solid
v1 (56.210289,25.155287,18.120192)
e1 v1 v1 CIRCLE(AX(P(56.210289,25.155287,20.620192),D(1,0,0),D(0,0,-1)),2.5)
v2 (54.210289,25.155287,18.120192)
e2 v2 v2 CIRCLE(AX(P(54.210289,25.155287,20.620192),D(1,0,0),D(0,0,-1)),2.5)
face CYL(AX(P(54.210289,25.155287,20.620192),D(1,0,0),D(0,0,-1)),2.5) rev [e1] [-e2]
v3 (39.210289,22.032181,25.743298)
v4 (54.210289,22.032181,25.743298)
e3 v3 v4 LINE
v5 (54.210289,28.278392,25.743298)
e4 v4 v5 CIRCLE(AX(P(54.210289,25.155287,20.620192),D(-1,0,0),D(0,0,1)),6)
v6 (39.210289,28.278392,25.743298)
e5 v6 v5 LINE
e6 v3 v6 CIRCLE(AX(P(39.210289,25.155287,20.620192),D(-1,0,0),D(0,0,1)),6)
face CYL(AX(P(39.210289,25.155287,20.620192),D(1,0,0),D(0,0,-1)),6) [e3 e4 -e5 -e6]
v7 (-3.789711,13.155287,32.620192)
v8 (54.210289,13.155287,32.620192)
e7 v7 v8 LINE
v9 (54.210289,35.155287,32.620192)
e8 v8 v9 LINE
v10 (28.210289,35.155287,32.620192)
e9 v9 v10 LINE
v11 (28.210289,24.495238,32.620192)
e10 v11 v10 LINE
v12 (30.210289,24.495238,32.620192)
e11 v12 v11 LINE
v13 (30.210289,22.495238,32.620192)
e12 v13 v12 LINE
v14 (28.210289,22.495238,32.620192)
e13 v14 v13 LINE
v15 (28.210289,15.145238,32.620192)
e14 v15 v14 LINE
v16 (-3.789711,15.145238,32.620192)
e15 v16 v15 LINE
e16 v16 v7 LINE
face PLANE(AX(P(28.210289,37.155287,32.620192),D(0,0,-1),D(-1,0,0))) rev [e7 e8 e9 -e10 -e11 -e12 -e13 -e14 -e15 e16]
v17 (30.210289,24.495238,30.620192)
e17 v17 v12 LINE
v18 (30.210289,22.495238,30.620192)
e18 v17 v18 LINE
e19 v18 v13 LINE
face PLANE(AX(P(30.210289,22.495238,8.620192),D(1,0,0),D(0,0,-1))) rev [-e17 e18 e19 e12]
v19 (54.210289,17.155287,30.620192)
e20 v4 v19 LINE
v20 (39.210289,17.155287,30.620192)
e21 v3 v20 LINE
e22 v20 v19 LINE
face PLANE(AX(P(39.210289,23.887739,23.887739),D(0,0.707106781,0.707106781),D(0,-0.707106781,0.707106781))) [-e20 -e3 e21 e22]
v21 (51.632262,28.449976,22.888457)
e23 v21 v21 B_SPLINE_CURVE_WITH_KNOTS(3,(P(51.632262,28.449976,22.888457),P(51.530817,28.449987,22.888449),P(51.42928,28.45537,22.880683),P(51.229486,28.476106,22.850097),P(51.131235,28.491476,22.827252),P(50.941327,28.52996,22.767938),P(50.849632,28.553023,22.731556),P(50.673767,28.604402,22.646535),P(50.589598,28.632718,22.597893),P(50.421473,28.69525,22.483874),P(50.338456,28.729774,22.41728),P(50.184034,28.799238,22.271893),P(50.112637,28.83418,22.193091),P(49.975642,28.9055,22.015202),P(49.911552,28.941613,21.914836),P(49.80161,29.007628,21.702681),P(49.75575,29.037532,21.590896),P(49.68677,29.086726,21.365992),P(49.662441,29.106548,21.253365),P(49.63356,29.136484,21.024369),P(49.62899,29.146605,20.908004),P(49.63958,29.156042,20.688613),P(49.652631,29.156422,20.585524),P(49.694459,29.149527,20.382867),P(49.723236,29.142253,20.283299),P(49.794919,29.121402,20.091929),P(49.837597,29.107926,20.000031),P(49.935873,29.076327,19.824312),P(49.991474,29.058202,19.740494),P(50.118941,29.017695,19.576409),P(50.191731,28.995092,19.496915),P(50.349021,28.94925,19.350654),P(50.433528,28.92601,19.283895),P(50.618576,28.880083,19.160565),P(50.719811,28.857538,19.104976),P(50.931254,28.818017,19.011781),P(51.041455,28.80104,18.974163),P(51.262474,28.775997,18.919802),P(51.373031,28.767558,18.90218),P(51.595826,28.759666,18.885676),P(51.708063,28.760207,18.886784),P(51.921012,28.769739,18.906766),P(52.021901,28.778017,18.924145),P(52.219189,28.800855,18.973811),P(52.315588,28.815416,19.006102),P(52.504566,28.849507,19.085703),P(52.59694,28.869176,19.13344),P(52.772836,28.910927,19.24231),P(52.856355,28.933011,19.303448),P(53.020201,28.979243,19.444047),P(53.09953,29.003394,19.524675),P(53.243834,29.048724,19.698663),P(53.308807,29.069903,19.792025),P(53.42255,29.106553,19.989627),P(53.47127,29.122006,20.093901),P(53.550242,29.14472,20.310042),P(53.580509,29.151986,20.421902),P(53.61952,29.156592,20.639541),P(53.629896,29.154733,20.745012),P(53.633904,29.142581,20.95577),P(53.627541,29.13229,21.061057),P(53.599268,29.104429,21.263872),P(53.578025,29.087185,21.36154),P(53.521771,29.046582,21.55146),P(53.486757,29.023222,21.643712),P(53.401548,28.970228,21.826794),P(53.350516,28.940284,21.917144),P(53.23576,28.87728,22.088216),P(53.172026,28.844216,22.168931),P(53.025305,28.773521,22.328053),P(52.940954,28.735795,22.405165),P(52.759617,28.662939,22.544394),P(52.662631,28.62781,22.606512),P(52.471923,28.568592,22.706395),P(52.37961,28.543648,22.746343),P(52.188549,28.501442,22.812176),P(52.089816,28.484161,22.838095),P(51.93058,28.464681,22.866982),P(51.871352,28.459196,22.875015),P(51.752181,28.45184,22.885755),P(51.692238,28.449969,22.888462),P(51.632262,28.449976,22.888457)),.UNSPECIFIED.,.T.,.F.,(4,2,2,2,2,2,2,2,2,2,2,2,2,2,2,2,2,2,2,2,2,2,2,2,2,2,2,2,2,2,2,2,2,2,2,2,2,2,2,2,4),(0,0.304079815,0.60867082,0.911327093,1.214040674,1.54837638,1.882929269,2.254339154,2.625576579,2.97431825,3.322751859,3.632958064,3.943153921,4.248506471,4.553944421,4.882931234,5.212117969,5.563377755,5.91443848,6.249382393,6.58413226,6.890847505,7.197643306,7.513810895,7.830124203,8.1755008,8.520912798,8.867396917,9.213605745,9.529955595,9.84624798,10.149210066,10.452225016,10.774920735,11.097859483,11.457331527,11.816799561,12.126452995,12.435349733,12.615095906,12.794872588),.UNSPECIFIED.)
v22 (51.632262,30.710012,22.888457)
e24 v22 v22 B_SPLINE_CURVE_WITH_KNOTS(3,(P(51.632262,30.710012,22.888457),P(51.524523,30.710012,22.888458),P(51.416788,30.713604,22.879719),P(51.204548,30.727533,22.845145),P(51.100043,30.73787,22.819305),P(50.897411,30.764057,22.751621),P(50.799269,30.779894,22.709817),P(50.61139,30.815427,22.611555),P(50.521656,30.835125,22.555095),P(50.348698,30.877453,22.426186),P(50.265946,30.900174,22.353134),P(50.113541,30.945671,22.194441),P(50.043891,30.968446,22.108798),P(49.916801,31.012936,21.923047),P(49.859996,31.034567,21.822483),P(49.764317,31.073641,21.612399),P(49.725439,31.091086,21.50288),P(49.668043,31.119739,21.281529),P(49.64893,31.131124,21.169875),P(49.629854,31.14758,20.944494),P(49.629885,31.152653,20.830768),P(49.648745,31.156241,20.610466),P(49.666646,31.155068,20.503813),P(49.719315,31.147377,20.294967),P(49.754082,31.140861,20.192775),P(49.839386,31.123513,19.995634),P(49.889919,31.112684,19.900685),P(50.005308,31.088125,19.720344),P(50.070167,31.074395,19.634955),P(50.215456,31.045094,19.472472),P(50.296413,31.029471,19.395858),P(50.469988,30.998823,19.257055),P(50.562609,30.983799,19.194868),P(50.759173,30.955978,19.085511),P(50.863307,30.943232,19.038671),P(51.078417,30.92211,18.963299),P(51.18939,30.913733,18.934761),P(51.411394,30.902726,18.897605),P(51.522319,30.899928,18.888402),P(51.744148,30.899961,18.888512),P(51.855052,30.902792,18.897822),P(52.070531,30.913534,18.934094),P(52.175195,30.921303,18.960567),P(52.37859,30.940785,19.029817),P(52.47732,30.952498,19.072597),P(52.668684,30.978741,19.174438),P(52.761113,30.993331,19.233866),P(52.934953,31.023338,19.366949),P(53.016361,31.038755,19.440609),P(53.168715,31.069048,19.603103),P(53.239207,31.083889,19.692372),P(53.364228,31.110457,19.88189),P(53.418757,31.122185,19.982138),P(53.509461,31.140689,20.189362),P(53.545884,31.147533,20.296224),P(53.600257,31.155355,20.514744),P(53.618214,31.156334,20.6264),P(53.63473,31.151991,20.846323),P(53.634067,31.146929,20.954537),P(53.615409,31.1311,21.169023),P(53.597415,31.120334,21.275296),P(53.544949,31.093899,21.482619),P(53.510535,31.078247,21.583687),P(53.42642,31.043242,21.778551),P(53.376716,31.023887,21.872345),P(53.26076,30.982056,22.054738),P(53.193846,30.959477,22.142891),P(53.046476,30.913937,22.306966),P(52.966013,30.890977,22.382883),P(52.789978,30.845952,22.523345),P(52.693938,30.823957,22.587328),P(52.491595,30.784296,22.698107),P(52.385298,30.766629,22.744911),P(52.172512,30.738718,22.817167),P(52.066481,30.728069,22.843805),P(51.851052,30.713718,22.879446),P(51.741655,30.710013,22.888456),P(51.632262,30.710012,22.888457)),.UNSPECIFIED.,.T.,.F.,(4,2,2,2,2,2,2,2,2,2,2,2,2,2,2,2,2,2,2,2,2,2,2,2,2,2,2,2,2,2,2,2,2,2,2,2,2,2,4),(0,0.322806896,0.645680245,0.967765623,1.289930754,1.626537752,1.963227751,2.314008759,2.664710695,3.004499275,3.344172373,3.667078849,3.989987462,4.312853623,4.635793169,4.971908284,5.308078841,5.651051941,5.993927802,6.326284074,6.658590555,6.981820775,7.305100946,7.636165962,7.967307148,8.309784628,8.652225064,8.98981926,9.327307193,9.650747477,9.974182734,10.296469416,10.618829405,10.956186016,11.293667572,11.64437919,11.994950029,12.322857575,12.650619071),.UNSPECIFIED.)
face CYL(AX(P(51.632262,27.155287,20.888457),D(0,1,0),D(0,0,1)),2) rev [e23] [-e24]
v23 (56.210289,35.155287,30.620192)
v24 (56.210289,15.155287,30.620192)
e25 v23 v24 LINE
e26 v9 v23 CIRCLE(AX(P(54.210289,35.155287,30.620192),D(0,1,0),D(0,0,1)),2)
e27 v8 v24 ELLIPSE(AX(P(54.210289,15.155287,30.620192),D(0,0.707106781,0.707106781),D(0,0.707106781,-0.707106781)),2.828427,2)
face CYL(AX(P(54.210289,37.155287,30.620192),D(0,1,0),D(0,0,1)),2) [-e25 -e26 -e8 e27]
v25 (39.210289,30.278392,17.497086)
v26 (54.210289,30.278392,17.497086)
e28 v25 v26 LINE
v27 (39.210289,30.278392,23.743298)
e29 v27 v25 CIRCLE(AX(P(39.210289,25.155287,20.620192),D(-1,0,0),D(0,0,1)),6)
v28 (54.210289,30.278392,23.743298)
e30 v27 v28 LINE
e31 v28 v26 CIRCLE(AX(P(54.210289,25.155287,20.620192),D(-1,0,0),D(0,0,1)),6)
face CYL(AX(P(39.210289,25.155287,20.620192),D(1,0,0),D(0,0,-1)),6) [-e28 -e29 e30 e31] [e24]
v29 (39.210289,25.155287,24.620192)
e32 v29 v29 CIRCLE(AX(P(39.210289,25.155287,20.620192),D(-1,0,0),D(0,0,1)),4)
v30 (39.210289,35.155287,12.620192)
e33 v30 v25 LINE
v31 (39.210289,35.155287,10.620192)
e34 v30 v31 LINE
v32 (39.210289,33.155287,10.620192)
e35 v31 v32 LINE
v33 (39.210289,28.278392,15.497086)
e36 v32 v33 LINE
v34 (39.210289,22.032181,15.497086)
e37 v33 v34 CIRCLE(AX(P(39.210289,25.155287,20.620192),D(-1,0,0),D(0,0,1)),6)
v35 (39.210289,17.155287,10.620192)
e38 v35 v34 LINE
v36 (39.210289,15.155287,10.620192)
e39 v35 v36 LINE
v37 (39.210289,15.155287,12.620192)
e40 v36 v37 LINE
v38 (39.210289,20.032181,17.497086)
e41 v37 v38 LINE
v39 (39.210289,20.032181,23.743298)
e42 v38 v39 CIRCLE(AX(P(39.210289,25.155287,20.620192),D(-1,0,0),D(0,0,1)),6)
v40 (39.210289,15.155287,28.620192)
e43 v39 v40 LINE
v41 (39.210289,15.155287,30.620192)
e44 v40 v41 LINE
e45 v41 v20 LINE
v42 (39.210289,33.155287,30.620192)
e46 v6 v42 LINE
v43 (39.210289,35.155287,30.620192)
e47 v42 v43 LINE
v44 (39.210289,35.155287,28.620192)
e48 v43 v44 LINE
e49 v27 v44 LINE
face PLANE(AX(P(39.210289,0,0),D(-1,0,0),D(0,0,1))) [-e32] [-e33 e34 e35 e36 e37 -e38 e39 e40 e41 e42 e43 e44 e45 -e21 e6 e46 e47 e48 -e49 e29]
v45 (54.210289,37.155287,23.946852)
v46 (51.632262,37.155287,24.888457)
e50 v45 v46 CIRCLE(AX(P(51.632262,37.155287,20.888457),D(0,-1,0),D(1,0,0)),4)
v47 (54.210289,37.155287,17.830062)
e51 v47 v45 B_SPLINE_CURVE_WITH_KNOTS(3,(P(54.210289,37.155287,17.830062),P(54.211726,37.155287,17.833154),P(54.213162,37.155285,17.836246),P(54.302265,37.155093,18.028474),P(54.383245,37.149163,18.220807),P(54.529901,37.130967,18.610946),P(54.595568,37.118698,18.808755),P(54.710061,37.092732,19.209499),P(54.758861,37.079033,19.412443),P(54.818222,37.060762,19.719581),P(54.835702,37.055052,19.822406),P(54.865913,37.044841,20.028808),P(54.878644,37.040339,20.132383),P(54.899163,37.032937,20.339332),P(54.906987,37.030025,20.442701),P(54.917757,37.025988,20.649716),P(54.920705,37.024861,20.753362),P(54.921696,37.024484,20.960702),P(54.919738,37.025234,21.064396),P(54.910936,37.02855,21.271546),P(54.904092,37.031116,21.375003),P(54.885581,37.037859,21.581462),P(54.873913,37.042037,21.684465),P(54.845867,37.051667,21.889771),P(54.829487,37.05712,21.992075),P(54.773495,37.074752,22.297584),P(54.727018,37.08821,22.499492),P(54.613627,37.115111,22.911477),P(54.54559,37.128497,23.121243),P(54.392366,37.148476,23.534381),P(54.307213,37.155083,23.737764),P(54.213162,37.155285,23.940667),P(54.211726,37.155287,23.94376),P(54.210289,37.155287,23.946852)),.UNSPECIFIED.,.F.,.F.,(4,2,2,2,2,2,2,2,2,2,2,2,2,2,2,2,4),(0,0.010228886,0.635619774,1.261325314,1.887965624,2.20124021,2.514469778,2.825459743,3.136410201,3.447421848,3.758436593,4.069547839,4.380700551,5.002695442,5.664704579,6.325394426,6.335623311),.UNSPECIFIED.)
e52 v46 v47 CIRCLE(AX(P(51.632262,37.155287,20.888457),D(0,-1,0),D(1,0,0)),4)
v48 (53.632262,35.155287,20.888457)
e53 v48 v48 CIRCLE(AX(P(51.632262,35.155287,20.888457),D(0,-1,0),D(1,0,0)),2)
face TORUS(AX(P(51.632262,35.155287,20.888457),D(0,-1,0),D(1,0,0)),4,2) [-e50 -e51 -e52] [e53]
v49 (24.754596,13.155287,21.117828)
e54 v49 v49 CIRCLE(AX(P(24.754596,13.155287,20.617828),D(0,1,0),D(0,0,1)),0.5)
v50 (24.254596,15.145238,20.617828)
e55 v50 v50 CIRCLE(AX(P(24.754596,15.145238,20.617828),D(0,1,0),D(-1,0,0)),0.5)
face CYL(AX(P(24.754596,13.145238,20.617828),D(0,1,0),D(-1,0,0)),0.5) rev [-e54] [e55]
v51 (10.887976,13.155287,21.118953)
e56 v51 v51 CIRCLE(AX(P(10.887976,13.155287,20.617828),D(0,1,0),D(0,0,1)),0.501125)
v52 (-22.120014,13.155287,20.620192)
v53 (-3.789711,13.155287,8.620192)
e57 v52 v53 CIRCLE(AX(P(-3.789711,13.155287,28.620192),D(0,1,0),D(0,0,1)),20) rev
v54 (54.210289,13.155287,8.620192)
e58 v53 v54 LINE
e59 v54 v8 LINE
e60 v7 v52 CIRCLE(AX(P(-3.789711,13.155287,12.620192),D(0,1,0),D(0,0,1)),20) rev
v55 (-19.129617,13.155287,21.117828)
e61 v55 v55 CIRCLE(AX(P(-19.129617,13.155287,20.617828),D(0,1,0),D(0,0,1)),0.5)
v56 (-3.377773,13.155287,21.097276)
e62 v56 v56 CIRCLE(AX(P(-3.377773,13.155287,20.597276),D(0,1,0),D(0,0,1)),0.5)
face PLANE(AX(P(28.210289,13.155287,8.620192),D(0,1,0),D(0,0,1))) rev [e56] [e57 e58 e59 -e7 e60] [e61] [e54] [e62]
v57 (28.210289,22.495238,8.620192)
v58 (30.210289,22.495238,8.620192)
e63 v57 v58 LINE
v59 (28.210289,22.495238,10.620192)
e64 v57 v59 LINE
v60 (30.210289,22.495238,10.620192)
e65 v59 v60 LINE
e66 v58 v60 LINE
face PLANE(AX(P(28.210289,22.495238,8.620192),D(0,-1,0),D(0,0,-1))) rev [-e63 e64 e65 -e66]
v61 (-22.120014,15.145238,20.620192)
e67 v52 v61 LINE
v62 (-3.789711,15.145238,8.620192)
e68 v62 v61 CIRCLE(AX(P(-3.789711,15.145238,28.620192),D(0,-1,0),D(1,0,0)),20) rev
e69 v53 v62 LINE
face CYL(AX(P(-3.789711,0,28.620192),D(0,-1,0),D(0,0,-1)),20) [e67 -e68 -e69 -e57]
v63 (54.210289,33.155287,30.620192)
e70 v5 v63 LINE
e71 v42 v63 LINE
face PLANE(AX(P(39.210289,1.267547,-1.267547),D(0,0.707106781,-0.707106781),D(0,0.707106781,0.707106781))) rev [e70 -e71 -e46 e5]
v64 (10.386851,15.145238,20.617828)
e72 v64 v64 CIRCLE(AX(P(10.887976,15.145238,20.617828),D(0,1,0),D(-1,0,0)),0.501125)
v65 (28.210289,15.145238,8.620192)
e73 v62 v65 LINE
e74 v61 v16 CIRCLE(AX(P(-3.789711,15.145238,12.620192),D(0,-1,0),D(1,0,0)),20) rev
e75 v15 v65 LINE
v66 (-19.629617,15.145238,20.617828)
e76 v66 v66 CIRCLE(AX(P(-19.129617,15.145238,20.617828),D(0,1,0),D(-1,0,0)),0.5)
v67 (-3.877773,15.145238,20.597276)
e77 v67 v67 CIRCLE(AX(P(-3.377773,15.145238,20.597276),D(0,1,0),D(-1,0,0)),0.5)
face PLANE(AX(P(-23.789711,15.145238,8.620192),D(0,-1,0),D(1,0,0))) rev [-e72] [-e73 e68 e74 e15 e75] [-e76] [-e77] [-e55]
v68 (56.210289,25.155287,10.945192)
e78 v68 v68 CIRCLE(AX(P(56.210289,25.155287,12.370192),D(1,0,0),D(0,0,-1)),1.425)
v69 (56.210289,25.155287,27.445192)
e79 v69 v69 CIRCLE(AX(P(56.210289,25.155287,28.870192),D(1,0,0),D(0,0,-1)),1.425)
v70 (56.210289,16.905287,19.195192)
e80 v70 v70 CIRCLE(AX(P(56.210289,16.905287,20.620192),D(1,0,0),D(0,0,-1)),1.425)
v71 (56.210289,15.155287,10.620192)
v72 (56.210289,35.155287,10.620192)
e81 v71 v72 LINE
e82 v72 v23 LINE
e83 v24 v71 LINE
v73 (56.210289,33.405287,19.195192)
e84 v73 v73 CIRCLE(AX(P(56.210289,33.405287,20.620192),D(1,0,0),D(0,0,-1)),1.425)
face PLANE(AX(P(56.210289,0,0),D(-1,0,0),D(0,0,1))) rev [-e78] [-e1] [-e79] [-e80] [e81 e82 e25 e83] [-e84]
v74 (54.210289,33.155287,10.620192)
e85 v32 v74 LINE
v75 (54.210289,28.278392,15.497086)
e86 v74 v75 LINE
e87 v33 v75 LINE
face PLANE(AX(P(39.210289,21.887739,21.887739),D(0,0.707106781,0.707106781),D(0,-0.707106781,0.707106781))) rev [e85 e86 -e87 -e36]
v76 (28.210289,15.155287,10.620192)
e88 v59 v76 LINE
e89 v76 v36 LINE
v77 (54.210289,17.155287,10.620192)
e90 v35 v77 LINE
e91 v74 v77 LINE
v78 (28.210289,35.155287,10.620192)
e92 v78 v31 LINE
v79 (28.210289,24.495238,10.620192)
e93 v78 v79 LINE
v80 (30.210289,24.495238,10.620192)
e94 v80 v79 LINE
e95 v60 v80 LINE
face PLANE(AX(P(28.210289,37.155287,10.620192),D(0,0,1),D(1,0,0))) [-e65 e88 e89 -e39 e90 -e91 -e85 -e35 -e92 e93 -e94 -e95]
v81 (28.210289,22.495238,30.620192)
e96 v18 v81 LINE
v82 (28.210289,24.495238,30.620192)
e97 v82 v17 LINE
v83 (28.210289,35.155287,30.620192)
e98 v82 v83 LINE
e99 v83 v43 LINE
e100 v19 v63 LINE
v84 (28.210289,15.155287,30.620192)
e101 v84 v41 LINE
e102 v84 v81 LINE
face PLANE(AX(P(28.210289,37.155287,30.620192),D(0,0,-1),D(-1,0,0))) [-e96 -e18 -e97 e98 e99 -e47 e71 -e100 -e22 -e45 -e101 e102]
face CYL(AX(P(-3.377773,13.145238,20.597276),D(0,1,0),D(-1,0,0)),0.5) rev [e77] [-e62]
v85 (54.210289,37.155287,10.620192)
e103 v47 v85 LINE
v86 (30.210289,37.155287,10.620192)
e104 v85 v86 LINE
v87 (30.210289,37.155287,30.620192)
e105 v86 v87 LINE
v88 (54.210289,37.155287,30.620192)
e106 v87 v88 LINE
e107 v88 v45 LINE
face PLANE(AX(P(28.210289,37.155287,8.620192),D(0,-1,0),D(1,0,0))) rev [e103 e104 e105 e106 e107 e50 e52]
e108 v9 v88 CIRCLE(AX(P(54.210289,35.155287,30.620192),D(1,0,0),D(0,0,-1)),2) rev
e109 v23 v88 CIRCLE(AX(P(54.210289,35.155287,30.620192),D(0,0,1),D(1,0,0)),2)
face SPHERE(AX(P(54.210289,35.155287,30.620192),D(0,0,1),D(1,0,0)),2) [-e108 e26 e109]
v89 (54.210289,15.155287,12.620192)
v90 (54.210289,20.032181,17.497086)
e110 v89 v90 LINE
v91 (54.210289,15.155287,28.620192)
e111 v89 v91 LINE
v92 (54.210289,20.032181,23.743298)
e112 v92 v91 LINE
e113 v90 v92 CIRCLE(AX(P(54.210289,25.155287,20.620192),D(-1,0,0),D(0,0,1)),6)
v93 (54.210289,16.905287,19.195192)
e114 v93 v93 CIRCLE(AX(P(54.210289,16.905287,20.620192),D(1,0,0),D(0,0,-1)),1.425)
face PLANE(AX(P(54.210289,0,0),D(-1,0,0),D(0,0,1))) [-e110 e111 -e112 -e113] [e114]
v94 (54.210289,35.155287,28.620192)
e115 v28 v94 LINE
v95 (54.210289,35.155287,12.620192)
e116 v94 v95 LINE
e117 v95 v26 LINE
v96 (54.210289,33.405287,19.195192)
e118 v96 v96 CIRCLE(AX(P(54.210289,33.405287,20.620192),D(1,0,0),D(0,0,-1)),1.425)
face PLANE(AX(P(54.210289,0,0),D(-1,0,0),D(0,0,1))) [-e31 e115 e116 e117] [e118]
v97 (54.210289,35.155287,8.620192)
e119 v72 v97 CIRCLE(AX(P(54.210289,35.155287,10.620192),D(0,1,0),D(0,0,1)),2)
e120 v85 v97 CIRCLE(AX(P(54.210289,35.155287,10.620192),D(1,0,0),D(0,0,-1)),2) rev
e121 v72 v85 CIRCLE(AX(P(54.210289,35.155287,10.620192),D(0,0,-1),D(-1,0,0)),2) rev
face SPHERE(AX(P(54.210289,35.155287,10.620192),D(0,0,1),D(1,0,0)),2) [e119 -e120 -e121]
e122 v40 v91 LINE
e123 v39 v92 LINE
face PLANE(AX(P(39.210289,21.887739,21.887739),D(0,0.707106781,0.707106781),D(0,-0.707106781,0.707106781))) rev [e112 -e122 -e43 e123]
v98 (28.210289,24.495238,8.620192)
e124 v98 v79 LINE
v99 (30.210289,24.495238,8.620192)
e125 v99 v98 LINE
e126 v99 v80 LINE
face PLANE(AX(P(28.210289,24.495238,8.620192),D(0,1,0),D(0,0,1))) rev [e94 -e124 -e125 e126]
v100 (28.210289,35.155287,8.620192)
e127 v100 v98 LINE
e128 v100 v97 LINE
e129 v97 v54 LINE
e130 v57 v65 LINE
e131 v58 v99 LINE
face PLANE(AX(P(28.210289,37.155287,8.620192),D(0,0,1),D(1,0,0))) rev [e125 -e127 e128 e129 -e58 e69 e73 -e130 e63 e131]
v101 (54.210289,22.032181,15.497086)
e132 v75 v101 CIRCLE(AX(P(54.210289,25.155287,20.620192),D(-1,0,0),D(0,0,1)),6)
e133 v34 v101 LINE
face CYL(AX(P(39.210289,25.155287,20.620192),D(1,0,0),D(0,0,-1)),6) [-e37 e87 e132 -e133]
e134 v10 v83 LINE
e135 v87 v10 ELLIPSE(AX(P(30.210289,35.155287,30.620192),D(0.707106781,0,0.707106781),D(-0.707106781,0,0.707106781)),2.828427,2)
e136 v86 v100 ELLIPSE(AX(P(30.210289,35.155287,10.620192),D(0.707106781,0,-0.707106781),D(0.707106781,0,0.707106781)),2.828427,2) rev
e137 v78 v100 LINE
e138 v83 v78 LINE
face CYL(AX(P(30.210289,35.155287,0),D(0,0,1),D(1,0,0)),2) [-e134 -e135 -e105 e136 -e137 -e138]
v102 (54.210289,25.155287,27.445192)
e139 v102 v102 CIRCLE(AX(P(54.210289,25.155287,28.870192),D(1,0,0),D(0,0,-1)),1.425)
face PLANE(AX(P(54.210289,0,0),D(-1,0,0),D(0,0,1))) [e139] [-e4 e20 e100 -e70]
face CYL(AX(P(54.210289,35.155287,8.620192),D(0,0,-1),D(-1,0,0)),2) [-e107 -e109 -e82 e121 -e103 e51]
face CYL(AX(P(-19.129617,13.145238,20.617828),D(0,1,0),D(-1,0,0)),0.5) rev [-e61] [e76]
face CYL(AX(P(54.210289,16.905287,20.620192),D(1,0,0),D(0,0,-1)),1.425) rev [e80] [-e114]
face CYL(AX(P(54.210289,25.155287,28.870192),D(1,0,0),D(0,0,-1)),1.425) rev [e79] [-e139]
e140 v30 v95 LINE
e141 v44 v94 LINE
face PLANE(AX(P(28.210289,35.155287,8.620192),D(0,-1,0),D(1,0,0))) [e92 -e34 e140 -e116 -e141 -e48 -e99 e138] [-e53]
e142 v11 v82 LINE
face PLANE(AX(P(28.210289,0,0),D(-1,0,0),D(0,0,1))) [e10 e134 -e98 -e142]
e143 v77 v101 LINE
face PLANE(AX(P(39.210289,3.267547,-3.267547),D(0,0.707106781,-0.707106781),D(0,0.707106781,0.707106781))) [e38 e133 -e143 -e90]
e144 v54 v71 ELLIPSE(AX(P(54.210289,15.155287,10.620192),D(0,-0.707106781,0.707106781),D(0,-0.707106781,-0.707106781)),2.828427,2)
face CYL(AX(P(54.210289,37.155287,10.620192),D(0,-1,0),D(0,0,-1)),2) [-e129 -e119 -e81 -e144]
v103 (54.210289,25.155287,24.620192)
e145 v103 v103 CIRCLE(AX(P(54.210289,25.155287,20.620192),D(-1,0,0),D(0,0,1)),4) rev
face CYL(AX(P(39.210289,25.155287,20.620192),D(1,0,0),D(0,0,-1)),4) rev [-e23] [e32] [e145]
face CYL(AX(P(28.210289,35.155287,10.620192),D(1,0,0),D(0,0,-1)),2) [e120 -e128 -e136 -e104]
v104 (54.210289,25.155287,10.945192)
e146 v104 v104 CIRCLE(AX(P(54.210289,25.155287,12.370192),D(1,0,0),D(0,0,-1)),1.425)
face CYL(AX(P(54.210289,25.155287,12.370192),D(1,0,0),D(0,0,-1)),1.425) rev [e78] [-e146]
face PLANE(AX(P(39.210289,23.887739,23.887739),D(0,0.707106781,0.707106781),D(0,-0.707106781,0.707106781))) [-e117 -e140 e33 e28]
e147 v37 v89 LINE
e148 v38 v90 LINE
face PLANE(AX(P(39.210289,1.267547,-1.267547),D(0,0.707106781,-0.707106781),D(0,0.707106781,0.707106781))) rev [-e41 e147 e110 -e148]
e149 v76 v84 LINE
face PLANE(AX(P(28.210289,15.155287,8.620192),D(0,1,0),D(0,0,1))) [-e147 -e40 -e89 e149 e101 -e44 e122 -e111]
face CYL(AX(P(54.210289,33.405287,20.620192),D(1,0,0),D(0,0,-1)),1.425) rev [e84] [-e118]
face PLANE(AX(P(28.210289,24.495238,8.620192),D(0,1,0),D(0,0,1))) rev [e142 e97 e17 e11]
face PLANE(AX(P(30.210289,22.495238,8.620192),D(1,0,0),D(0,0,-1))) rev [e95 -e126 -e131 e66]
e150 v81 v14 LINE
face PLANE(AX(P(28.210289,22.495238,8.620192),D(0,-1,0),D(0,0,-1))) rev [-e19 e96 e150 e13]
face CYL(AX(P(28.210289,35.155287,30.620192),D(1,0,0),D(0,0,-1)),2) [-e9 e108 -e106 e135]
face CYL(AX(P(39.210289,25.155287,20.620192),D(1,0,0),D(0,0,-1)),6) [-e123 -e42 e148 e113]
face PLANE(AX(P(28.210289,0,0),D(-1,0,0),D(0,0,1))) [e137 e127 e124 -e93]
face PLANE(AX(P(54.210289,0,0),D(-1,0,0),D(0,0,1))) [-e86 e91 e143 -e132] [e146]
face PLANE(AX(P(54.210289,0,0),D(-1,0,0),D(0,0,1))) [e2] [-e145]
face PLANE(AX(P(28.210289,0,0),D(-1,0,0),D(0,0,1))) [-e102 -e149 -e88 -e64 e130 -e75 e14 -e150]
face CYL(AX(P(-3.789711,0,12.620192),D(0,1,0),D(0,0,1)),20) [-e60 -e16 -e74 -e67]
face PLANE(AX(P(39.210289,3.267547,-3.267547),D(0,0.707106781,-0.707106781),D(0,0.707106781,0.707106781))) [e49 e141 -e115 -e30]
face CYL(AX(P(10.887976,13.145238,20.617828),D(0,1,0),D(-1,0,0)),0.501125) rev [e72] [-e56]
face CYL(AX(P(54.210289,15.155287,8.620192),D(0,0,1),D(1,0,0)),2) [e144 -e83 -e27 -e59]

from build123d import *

# Parameters (mm, degrees)
SKETCH1_W            = 24
SKETCH1_H            = 24
BOSS_EXTRUDE6_DEPTH  = 28
SHELL6_T             = -2
SKETCH4_R            = 1.425
SKETCH4_R_2          = 2.5
CUT_EXTRUDE2_DEPTH   = 2
BOSS_EXTRUDE12_DEPTH = 15
SKETCH5_R            = 2
CUT_EXTRUDE4_DEPTH   = 10
SKETCH8_W            = 24
SKETCH8_H            = 1.989951349
BOSS_EXTRUDE13_DEPTH = 52
FILLET1_R            = 20
SKETCH12_R           = 0.5
SKETCH12_R_2         = 0.501124618
CUT_EXTRUDE5_DEPTH   = 2
SKETCH15_W           = 2
SKETCH15_H           = 2
CUT_EXTRUDE8_DEPTH   = 72.527001046
FILLET3_R            = 2


with BuildPart() as part:
    # Sketch1 → Boss-Extrude6 (new body)
    with BuildSketch(Plane.ZY.offset(-56.210288662)):
        with Locations((20.620192101, 25.155286665)):
            Rectangle(SKETCH1_W, SKETCH1_H)
    extrude(amount=BOSS_EXTRUDE6_DEPTH)

    # Shell6
    shell6_openings = [part.faces().sort_by_distance(p)[0] for p in [
        (28.210288662, 25.155286665, 20.620192101),
    ]]
    offset(amount=SHELL6_T, openings=shell6_openings, kind=Kind.INTERSECTION)

    # Sketch4 → Cut-Extrude2 (cut)
    with BuildSketch(Plane(origin=(56.210288662, 25.155286665, 20.620192101), x_dir=(0, 0, -1), z_dir=(1, 0, 0))):
        with Locations((0, -8.25)):
            Circle(SKETCH4_R)
        with Locations((8.25, 0)):
            Circle(SKETCH4_R)
        with Locations((0, 8.25)):
            Circle(SKETCH4_R)
        with Locations((-8.25, 0)):
            Circle(SKETCH4_R)
        Circle(SKETCH4_R_2)
    extrude(amount=-CUT_EXTRUDE2_DEPTH, mode=Mode.SUBTRACT)

    # Sketch7 → Boss-Extrude12 (add)
    with BuildSketch(Plane.ZY.offset(-54.210288662)):
        with BuildLine():
            Line((24.862832788, 20.912645978), (30.620192101, 15.155286665))
            Line((30.620192101, 15.155286665), (30.620192101, 17.155286665))
            Line((30.620192101, 17.155286665), (25.743297726, 22.032181039))
            ThreePointArc((25.743297726, 22.032181039), (25.336402517, 21.446195225), (24.862832788, 20.912645978))
        make_face()
        with BuildLine():
            Line((28.620192101, 15.155286665), (30.620192101, 15.155286665))
            Line((30.620192101, 15.155286665), (24.862832788, 20.912645978))
            ThreePointArc((24.862832788, 20.912645978), (24.329283541, 20.439076249), (23.743297726, 20.032181039))
            Line((23.743297726, 20.032181039), (28.620192101, 15.155286665))
        make_face()
        with BuildLine():
            Line((10.620192101, 15.155286665), (12.620192101, 15.155286665))
            Line((12.620192101, 15.155286665), (17.497086475, 20.032181039))
            ThreePointArc((17.497086475, 20.032181039), (16.91110066, 20.439076249), (16.377551414, 20.912645978))
            Line((16.377551414, 20.912645978), (10.620192101, 15.155286665))
        make_face()
        with BuildLine():
            Line((10.620192101, 17.155286665), (10.620192101, 15.155286665))
            Line((10.620192101, 15.155286665), (16.377551414, 20.912645978))
            ThreePointArc((16.377551414, 20.912645978), (15.903981685, 21.446195225), (15.497086475, 22.032181039))
            Line((15.497086475, 22.032181039), (10.620192101, 17.155286665))
        make_face()
        with BuildLine():
            Line((10.620192101, 35.155286665), (10.620192101, 33.155286665))
            Line((10.620192101, 33.155286665), (15.497086475, 28.278392291))
            ThreePointArc((15.497086475, 28.278392291), (15.903981685, 28.864378105), (16.377551414, 29.397927352))
            Line((16.377551414, 29.397927352), (10.620192101, 35.155286665))
        make_face()
        with BuildLine():
            Line((17.497086475, 30.278392291), (12.620192101, 35.155286665))
            Line((12.620192101, 35.155286665), (10.620192101, 35.155286665))
            Line((10.620192101, 35.155286665), (16.377551414, 29.397927352))
            ThreePointArc((16.377551414, 29.397927352), (16.91110066, 29.871497081), (17.497086475, 30.278392291))
        make_face()
        with BuildLine():
            Line((24.862832788, 29.397927352), (30.620192101, 35.155286665))
            Line((30.620192101, 35.155286665), (28.620192101, 35.155286665))
            Line((28.620192101, 35.155286665), (23.743297726, 30.278392291))
            ThreePointArc((23.743297726, 30.278392291), (24.329283541, 29.871497081), (24.862832788, 29.397927352))
        make_face()
        with BuildLine():
            Line((25.743297726, 28.278392291), (30.620192101, 33.155286665))
            Line((30.620192101, 33.155286665), (30.620192101, 35.155286665))
            Line((30.620192101, 35.155286665), (24.862832788, 29.397927352))
            ThreePointArc((24.862832788, 29.397927352), (25.336402517, 28.864378105), (25.743297726, 28.278392291))
        make_face()
        with BuildLine():
            Line((22.265943412, 28.801037976), (23.743297726, 30.278392291))
            ThreePointArc((23.743297726, 30.278392291), (20.620192101, 31.155286665), (17.497086475, 30.278392291))
            Line((17.497086475, 30.278392291), (18.97444079, 28.801037976))
            ThreePointArc((18.97444079, 28.801037976), (20.620192101, 29.155286665), (22.265943412, 28.801037976))
        make_face()
        with BuildLine():
            ThreePointArc((15.497086475, 22.032181039), (15.903981685, 21.446195225), (16.377551414, 20.912645978))
            Line((16.377551414, 20.912645978), (17.791764976, 22.32685954))
            ThreePointArc((17.791764976, 22.32685954), (17.329534549, 22.881177416), (16.97444079, 23.509535354))
            Line((16.97444079, 23.509535354), (15.497086475, 22.032181039))
        make_face()
        with BuildLine():
            Line((23.448619226, 27.98371379), (24.862832788, 29.397927352))
            ThreePointArc((24.862832788, 29.397927352), (24.329283541, 29.871497081), (23.743297726, 30.278392291))
            Line((23.743297726, 30.278392291), (22.265943412, 28.801037976))
            ThreePointArc((22.265943412, 28.801037976), (22.89430135, 28.445944217), (23.448619226, 27.98371379))
        make_face()
        with BuildLine():
            ThreePointArc((16.377551414, 20.912645978), (16.91110066, 20.439076249), (17.497086475, 20.032181039))
            Line((17.497086475, 20.032181039), (18.97444079, 21.509535354))
            ThreePointArc((18.97444079, 21.509535354), (18.346082852, 21.864629113), (17.791764976, 22.32685954))
            Line((17.791764976, 22.32685954), (16.377551414, 20.912645978))
        make_face()
        with BuildLine():
            Line((24.265943412, 26.801037976), (25.743297726, 28.278392291))
            ThreePointArc((25.743297726, 28.278392291), (25.336402517, 28.864378105), (24.862832788, 29.397927352))
            Line((24.862832788, 29.397927352), (23.448619226, 27.98371379))
            ThreePointArc((23.448619226, 27.98371379), (23.910849653, 27.429395914), (24.265943412, 26.801037976))
        make_face()
        with BuildLine():
            Line((24.265943412, 23.509535354), (25.743297726, 22.032181039))
            ThreePointArc((25.743297726, 22.032181039), (26.396810218, 23.533348589), (26.620192101, 25.155286665))
            ThreePointArc((26.620192101, 25.155286665), (26.396810218, 26.777224741), (25.743297726, 28.278392291))
            Line((25.743297726, 28.278392291), (24.265943412, 26.801037976))
            ThreePointArc((24.265943412, 26.801037976), (24.530627195, 25.997009528), (24.620192101, 25.155286665))
            ThreePointArc((24.620192101, 25.155286665), (24.530627195, 24.313563802), (24.265943412, 23.509535354))
        make_face()
        with BuildLine():
            Line((23.448619226, 22.32685954), (24.862832788, 20.912645978))
            ThreePointArc((24.862832788, 20.912645978), (25.336402517, 21.446195225), (25.743297726, 22.032181039))
            Line((25.743297726, 22.032181039), (24.265943412, 23.509535354))
            ThreePointArc((24.265943412, 23.509535354), (23.910849653, 22.881177416), (23.448619226, 22.32685954))
        make_face()
        with BuildLine():
            Line((16.377551414, 29.397927352), (17.791764976, 27.98371379))
            ThreePointArc((17.791764976, 27.98371379), (18.346082852, 28.445944217), (18.97444079, 28.801037976))
            Line((18.97444079, 28.801037976), (17.497086475, 30.278392291))
            ThreePointArc((17.497086475, 30.278392291), (16.91110066, 29.871497081), (16.377551414, 29.397927352))
        make_face()
        with BuildLine():
            ThreePointArc((23.743297726, 20.032181039), (24.329283541, 20.439076249), (24.862832788, 20.912645978))
            Line((24.862832788, 20.912645978), (23.448619226, 22.32685954))
            ThreePointArc((23.448619226, 22.32685954), (22.89430135, 21.864629113), (22.265943412, 21.509535354))
            Line((22.265943412, 21.509535354), (23.743297726, 20.032181039))
        make_face()
        with BuildLine():
            ThreePointArc((16.97444079, 26.801037976), (17.329534549, 27.429395914), (17.791764976, 27.98371379))
            Line((17.791764976, 27.98371379), (16.377551414, 29.397927352))
            ThreePointArc((16.377551414, 29.397927352), (15.903981685, 28.864378105), (15.497086475, 28.278392291))
            Line((15.497086475, 28.278392291), (16.97444079, 26.801037976))
        make_face()
        with BuildLine():
            ThreePointArc((17.497086475, 20.032181039), (20.620192101, 19.155286665), (23.743297726, 20.032181039))
            Line((23.743297726, 20.032181039), (22.265943412, 21.509535354))
            ThreePointArc((22.265943412, 21.509535354), (20.620192101, 21.155286665), (18.97444079, 21.509535354))
            Line((18.97444079, 21.509535354), (17.497086475, 20.032181039))
        make_face()
        with BuildLine():
            ThreePointArc((15.497086475, 28.278392291), (14.620192101, 25.155286665), (15.497086475, 22.032181039))
            Line((15.497086475, 22.032181039), (16.97444079, 23.509535354))
            ThreePointArc((16.97444079, 23.509535354), (16.620192101, 25.155286665), (16.97444079, 26.801037976))
            Line((16.97444079, 26.801037976), (15.497086475, 28.278392291))
        make_face()
    extrude(amount=BOSS_EXTRUDE12_DEPTH)

    # Sketch5 → Cut-Extrude4 (cut)
    with BuildSketch(Plane(origin=(0, 37.155286665, 0), x_dir=(1, 0, 0), z_dir=(0, 1, 0))):
        with Locations(Location((51.632262187, -20.888456892, 0), (0, 0, 270))):
            Circle(SKETCH5_R)
    extrude(amount=-CUT_EXTRUDE4_DEPTH, mode=Mode.SUBTRACT)

    # Sketch8 → Boss-Extrude13 (add)
    with BuildSketch(Plane.ZY.offset(-28.210288662)):
        with Locations((20.620192101, 14.150262339)):
            Rectangle(SKETCH8_W, SKETCH8_H)
    extrude(amount=BOSS_EXTRUDE13_DEPTH)

    # Fillet1
    # the kernel refuses this fillet: 20 mm, written as the material it takes off along each edge
    with BuildSketch(Plane(origin=(-23.789711338, 65.145238014, 8.620192101), x_dir=(0, 0, 1), z_dir=(0, -1, 0))) as fillet1_piece_1:
        with BuildLine():
            CenterArc((FILLET1_R, -FILLET1_R), FILLET1_R, 90, 90)
            Line((0, -FILLET1_R), (0, 0))
            Line((0, 0), (FILLET1_R, 0))
        make_face()
    extrude(amount=101.989951349, mode=Mode.SUBTRACT)
    with BuildSketch(Plane(origin=(-23.789711338, -36.844713335, 32.620192101), x_dir=(1, 0, 0), z_dir=(0, 1, 0))) as fillet1_piece_2:
        with BuildLine():
            CenterArc((FILLET1_R, FILLET1_R), FILLET1_R, 180, 90)
            Line((0, FILLET1_R), (0, 0))
            Line((0, 0), (FILLET1_R, 0))
        make_face()
    extrude(amount=101.989951349, mode=Mode.SUBTRACT)

    # Sketch12 → Cut-Extrude5 (cut)
    with BuildSketch(Plane(origin=(0, 15.145238014, 0), x_dir=(1, 0, 0), z_dir=(0, 1, 0))):
        with Locations(Location((-3.377772721, -20.597275642, 0), (0, 0, 180))):
            Circle(SKETCH12_R)
        with Locations(Location((-19.129616691, -20.617828064, 0), (0, 0, 180))):
            Circle(SKETCH12_R)
        with Locations(Location((10.8879759, -20.617828064, 0), (0, 0, 180))):
            Circle(SKETCH12_R_2)
        with Locations(Location((24.75459638, -20.617828064, 0), (0, 0, 180))):
            Circle(SKETCH12_R)
    extrude(amount=-CUT_EXTRUDE5_DEPTH, mode=Mode.SUBTRACT)

    # Sketch15 → Cut-Extrude8 (cut, through all)
    with BuildSketch(Plane.XY.offset(32.620192101)):
        with Locations((29.210288662, 23.495238014)):
            Rectangle(SKETCH15_W, SKETCH15_H)
    extrude(amount=-CUT_EXTRUDE8_DEPTH, mode=Mode.SUBTRACT)

    # Fillet3
    # the kernel refuses this fillet: 2 mm, written as the material it takes off along each edge
    with BuildSketch(Plane(origin=(54.210288662, 35.155286665, 10.620192101), x_dir=(0, 0, -1), z_dir=(0, 1, 0))) as fillet3_piece_1_section:
        Polygon((0, 0), (FILLET3_R, 0), (FILLET3_R, -FILLET3_R), (0, -FILLET3_R), align=None)
    fillet3_piece_1 = extrude(amount=FILLET3_R, mode=Mode.PRIVATE)
    fillet3_piece_1 = fillet3_piece_1 - Plane(origin=(54.210288662, 35.155286665, 10.620192101), x_dir=(-0.7071067811865352, 0, 0.7071067811865597), z_dir=(0, 1, 0)) * Sphere(FILLET3_R, mode=Mode.PRIVATE)
    add(fillet3_piece_1, mode=Mode.SUBTRACT)
    with BuildSketch(Plane(origin=(54.210288662, 35.155286665, 30.620192101), x_dir=(1, 0, 0), z_dir=(0, 1, 0))) as fillet3_piece_2_section:
        Polygon((0, 0), (FILLET3_R, 0), (FILLET3_R, -FILLET3_R), (0, -FILLET3_R), align=None)
    fillet3_piece_2 = extrude(amount=FILLET3_R, mode=Mode.PRIVATE)
    fillet3_piece_2 = fillet3_piece_2 - Plane(origin=(54.210288662, 35.155286665, 30.620192101), x_dir=(-0.7071067811865597, 0, -0.7071067811865352), z_dir=(0, 1, 0)) * Sphere(FILLET3_R, mode=Mode.PRIVATE)
    add(fillet3_piece_2, mode=Mode.SUBTRACT)
    with BuildSketch(Plane(origin=(51.632262187, 37.155286665, 20.888456892), x_dir=(0, 0, 1), z_dir=(-1, 0, 0))) as fillet3_piece_3:
        with BuildLine():
            CenterArc((2 + FILLET3_R, -FILLET3_R), FILLET3_R, 90, 90)
            Line((2, -FILLET3_R), (2, 0))
            Line((2, 0), (2 + FILLET3_R, 0))
        make_face()
    revolve(axis=Axis((51.632262187, 37.155286665, 20.888456892), (0, 1, 0)), mode=Mode.SUBTRACT)
    with BuildSketch(Plane(origin=(28.210288662, 37.155286665, 3.620192101), x_dir=(1, 0, 0), z_dir=(0, 0, 1)), Plane(origin=(56.210288662, 13.155286665, 37.620192101), x_dir=(0, 1, 0), z_dir=(0, 0, -1))) as fillet3_piece_4:
        with BuildLine():
            CenterArc((FILLET3_R, -FILLET3_R), FILLET3_R, 90, 90)
            Line((0, -FILLET3_R), (0, 0))
            Line((0, 0), (FILLET3_R, 0))
        make_face()
    extrude(amount=34, mode=Mode.SUBTRACT)
    with BuildSketch(Plane(origin=(56.210288662, 37.155286665, 10.620192101), x_dir=(-1, 0, 0), z_dir=(0, 0, 1))) as fillet3_piece_5:
        with BuildLine():
            CenterArc((FILLET3_R, FILLET3_R), FILLET3_R, 180, 90)
            Line((0, FILLET3_R), (0, 0))
            Line((0, 0), (FILLET3_R, 0))
        make_face()
    extrude(amount=20, mode=Mode.SUBTRACT)
    with BuildSketch(Plane(origin=(56.210288662, 35.155286665, 32.620192101), x_dir=(0, 0, -1), z_dir=(0, -1, 0))) as fillet3_piece_6:
        with BuildLine():
            CenterArc((FILLET3_R, -FILLET3_R), FILLET3_R, 90, 90)
            Line((0, -FILLET3_R), (0, 0))
            Line((0, 0), (FILLET3_R, 0))
        make_face()
    extrude(amount=27, mode=Mode.SUBTRACT)
    with BuildSketch(Plane(origin=(56.210288662, 8.155286665, 8.620192101), x_dir=(-1, 0, 0), z_dir=(0, 1, 0))) as fillet3_piece_7:
        with BuildLine():
            CenterArc((FILLET3_R, FILLET3_R), FILLET3_R, 180, 90)
            Line((0, FILLET3_R), (0, 0))
            Line((0, 0), (FILLET3_R, 0))
        make_face()
    extrude(amount=27, mode=Mode.SUBTRACT)
    with BuildSketch(Plane(origin=(54.210288662, 37.155286665, 8.620192101), x_dir=(0, 0, 1), z_dir=(-1, 0, 0))) as fillet3_piece_8:
        with BuildLine():
            CenterArc((FILLET3_R, -FILLET3_R), FILLET3_R, 90, 90)
            Line((0, -FILLET3_R), (0, 0))
            Line((0, 0), (FILLET3_R, 0))
        make_face()
    extrude(amount=31, mode=Mode.SUBTRACT)
    with BuildSketch(Plane(origin=(54.210288662, 37.155286665, 32.620192101), x_dir=(0, 0, -1), z_dir=(-1, 0, 0))) as fillet3_piece_9:
        with BuildLine():
            CenterArc((FILLET3_R, FILLET3_R), FILLET3_R, 180, 90)
            Line((0, FILLET3_R), (0, 0))
            Line((0, 0), (FILLET3_R, 0))
        make_face()
    extrude(amount=31, mode=Mode.SUBTRACT)


solid = part.part
